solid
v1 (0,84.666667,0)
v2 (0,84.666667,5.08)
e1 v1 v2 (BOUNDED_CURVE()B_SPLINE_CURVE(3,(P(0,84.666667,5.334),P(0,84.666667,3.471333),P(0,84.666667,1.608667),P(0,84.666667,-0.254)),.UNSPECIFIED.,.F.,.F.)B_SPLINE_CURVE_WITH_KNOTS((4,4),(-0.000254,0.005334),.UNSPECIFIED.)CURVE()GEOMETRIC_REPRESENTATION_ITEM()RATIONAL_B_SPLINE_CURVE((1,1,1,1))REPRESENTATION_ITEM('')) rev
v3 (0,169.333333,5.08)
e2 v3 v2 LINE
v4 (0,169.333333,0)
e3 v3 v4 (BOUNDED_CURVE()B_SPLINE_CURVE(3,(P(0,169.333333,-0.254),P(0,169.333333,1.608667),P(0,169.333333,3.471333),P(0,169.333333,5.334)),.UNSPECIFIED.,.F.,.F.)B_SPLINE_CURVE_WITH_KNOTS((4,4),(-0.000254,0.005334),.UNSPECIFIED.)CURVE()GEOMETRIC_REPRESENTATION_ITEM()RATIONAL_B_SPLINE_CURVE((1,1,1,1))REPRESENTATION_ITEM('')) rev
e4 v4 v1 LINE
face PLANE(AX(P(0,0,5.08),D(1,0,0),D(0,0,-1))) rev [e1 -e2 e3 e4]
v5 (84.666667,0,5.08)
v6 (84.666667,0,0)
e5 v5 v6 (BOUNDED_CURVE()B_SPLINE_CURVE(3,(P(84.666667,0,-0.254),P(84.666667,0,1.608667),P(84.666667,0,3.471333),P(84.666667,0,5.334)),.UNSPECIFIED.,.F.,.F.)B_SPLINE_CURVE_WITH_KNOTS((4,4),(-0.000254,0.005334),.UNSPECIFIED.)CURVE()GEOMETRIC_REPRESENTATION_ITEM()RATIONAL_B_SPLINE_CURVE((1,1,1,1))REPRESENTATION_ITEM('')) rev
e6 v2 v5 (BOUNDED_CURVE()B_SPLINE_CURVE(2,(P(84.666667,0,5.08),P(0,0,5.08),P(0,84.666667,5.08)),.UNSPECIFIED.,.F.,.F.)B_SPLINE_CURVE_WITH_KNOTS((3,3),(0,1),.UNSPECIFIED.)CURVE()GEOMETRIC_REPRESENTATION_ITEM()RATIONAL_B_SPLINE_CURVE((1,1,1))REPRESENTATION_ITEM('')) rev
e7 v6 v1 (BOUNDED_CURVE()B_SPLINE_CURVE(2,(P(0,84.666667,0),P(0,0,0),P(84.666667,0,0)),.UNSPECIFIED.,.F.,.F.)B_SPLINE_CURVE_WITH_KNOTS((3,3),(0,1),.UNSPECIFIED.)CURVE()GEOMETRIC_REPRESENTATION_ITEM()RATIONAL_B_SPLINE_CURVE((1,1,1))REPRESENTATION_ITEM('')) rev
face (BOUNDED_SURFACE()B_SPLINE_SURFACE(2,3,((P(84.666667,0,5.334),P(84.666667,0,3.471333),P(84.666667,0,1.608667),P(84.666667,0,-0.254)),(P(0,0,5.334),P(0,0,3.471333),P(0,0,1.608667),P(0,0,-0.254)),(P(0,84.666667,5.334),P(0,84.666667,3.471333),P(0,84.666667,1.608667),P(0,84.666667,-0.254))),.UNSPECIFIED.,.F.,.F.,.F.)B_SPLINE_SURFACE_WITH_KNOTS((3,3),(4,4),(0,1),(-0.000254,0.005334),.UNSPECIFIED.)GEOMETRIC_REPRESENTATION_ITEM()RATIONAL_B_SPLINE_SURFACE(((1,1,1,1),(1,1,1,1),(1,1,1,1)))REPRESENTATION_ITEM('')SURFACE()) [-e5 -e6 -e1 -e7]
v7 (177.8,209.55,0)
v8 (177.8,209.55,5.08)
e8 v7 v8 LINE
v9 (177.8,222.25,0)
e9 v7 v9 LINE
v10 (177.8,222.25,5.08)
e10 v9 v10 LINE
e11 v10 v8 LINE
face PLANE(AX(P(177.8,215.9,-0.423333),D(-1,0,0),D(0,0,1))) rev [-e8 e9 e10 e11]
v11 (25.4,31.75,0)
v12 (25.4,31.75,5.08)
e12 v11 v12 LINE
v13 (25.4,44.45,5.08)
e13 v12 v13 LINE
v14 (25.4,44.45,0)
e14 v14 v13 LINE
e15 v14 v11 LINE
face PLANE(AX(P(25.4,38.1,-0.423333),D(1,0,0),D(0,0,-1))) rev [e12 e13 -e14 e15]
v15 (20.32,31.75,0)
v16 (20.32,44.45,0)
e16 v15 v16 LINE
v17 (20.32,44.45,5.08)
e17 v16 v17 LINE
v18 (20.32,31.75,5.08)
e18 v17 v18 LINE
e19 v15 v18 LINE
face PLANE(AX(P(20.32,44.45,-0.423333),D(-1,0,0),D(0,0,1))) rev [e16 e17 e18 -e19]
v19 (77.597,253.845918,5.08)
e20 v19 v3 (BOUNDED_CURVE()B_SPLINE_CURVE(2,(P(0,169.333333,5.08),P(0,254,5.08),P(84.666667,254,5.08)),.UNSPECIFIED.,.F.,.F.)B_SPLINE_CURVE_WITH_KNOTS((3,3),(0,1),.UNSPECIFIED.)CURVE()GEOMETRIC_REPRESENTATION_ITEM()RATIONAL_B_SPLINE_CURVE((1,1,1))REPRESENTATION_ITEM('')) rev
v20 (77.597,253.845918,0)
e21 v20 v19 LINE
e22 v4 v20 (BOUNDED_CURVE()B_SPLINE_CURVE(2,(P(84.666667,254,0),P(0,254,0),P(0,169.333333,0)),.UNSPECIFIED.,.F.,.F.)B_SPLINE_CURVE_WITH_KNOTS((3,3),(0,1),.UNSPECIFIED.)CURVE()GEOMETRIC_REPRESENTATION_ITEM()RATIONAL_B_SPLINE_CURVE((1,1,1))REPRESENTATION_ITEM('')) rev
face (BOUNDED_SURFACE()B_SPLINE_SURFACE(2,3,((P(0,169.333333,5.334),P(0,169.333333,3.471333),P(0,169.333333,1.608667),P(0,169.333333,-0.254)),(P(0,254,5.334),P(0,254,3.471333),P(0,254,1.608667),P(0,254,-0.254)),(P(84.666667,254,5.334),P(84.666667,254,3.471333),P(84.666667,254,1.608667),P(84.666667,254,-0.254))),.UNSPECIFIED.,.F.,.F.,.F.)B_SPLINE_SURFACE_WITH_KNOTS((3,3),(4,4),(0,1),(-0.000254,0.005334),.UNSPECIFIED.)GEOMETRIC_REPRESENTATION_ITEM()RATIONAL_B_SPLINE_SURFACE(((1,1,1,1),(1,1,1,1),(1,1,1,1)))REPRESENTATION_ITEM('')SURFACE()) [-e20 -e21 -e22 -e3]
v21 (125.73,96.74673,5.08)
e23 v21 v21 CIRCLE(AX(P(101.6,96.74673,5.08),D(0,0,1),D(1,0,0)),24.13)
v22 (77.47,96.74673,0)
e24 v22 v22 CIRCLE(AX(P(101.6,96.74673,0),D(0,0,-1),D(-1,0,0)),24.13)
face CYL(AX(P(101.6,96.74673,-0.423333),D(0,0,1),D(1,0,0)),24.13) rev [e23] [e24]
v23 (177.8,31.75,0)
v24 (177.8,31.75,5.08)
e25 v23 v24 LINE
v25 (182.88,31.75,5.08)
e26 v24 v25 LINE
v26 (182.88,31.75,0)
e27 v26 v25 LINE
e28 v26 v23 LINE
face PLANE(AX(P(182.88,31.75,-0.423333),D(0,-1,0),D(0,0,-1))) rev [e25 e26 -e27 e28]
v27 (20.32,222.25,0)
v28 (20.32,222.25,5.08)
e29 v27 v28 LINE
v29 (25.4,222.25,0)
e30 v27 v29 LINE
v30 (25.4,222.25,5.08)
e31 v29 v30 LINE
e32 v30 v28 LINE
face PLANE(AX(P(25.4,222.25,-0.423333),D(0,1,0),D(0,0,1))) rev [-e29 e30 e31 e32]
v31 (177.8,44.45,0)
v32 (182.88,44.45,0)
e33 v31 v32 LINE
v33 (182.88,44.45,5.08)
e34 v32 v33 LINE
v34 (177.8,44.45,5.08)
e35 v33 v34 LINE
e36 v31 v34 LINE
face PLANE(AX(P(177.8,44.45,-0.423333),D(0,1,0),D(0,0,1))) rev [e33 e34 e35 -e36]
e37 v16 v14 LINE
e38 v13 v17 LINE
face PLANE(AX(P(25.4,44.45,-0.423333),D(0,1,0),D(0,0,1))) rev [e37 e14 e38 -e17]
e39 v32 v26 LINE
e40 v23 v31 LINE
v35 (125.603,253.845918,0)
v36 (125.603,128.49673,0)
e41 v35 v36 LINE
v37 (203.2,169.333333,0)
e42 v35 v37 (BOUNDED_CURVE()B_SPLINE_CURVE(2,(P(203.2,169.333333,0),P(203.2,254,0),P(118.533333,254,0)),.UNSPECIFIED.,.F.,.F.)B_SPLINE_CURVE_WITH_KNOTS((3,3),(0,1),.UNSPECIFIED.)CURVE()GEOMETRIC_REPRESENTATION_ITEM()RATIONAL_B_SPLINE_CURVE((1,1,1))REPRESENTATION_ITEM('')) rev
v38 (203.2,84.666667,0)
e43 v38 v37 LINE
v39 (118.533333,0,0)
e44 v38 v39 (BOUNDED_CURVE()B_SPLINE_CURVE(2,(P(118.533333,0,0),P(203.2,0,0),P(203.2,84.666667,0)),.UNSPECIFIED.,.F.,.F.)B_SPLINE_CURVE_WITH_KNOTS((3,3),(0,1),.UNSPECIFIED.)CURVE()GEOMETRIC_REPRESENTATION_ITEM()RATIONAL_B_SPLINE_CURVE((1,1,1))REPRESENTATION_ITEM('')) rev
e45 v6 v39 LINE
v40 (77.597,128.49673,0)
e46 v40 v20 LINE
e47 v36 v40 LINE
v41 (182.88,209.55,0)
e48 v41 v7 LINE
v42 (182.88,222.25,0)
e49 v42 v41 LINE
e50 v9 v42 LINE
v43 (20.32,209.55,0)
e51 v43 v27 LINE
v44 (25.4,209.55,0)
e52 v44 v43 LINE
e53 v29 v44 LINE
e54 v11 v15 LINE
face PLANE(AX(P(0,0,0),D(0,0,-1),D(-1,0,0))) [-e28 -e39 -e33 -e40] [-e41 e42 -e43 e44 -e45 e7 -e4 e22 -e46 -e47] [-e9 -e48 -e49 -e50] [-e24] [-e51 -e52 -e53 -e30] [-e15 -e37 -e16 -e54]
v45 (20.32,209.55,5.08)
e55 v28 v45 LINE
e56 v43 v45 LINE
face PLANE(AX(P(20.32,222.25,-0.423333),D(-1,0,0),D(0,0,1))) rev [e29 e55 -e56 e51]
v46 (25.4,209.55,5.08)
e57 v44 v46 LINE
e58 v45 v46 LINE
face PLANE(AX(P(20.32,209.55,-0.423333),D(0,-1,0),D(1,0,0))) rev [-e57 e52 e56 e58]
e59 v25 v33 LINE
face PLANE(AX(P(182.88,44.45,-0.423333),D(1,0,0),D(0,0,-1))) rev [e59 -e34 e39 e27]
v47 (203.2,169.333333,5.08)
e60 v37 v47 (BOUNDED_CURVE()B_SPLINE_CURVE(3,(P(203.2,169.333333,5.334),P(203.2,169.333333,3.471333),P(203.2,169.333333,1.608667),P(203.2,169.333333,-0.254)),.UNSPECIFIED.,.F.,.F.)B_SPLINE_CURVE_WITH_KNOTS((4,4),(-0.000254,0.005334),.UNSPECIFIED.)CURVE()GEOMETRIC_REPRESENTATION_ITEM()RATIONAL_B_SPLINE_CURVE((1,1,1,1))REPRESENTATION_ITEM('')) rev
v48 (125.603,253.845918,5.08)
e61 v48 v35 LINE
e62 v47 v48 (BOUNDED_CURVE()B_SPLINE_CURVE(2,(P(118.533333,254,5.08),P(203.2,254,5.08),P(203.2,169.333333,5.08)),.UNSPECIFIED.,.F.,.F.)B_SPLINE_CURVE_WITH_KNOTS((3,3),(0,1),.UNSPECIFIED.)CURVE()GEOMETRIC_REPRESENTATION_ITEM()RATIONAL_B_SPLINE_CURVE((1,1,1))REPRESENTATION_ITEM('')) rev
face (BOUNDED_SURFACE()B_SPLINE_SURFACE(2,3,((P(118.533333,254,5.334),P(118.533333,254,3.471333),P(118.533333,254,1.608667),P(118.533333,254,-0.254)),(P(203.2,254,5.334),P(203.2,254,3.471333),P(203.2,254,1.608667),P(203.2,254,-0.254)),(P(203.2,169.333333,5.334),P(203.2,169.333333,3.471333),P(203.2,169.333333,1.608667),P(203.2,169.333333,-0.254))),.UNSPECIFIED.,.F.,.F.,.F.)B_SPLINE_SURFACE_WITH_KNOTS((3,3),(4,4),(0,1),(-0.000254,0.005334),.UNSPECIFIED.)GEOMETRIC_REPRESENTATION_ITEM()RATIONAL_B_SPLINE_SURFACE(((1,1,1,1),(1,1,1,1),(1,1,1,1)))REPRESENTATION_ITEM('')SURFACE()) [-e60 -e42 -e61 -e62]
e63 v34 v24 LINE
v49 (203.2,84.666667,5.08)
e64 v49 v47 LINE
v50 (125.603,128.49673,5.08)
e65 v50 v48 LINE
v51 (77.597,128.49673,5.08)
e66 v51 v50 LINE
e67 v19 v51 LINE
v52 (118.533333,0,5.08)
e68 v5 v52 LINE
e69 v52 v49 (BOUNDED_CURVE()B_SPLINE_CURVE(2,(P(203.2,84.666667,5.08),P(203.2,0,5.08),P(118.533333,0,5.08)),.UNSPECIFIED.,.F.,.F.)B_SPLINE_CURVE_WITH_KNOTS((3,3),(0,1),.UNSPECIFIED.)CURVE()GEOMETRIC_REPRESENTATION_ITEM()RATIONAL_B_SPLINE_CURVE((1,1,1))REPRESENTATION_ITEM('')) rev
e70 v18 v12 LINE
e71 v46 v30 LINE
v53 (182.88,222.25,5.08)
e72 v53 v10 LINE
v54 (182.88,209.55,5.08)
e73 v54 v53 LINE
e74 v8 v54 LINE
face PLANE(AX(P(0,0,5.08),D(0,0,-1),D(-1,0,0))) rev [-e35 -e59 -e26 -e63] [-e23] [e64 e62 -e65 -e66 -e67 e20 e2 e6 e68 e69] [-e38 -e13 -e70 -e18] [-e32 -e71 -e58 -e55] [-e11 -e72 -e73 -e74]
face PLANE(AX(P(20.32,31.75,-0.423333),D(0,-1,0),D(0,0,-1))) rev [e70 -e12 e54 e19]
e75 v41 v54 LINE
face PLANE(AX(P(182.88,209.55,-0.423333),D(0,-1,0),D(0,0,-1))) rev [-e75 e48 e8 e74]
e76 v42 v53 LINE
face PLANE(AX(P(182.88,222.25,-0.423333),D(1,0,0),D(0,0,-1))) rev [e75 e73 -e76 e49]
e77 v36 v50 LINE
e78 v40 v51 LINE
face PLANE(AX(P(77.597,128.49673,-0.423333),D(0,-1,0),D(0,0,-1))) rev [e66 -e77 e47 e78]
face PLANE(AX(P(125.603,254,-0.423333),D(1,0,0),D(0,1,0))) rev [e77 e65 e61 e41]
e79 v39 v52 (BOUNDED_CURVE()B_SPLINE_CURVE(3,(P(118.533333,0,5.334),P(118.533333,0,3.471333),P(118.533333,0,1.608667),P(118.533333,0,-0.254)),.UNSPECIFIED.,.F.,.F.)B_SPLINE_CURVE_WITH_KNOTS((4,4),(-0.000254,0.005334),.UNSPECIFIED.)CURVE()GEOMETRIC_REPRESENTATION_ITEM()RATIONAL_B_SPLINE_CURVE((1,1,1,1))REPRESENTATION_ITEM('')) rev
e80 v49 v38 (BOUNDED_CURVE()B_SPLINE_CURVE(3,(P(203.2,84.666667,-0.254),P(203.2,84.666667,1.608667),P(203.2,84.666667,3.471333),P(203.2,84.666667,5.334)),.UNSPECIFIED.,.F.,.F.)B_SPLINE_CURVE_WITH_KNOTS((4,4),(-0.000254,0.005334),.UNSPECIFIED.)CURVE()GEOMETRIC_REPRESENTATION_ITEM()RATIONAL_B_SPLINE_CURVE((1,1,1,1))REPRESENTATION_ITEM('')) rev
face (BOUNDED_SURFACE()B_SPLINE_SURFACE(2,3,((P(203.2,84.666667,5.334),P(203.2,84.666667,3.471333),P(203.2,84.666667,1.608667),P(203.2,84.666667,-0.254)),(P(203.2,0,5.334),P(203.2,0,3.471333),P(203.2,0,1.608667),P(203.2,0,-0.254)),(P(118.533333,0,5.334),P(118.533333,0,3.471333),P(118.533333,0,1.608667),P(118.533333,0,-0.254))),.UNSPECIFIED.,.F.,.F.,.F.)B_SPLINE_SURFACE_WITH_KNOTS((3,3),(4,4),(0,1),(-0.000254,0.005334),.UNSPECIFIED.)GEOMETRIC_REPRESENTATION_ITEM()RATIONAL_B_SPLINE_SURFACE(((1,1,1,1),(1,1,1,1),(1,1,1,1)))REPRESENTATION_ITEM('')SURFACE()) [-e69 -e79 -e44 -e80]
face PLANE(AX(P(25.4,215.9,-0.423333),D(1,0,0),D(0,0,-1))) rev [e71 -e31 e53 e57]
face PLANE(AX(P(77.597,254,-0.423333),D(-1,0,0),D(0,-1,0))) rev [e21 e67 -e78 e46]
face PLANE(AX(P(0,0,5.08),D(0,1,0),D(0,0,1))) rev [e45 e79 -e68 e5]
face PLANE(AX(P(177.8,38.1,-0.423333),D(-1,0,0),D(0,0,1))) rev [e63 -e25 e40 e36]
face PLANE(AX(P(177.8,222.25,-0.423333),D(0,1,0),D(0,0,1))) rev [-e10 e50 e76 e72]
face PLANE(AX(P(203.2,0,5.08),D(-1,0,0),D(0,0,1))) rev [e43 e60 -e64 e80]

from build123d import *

# Parameters (mm, degrees)
SKETCH1_W           = 203.2
SKETCH1_H           = 254
BOSS_EXTRUDE1_DEPTH = 5.08
FILLET1_SIZE        = 84.666666667
SKETCH2_R           = 24.13
CUT_EXTRUDE1_DEPTH  = 326.318377121
SKETCH8_W           = 48.006
SKETCH8_H           = 125.503270334
CUT_EXTRUDE6_DEPTH  = 326.318377121
CUT_EXTRUDE7_DEPTH  = 326.198087964


with BuildPart() as part:
    # Sketch1 → Boss-Extrude1 (new body)
    with BuildSketch(Plane.XY):
        with Locations((101.6, 127)):
            Rectangle(SKETCH1_W, SKETCH1_H)
    extrude(amount=BOSS_EXTRUDE1_DEPTH)

    # Fillet1
    # a fillet whose section is not a circle: 84.666666667 mm, written as the material it takes off along each edge
    with BuildSketch(Plane(origin=(203.2, 254, -211.666666667), x_dir=(0, -1, 0), z_dir=(0, 0, 1)), Plane(origin=(0, 254, -211.666666667), x_dir=(1, 0, 0), z_dir=(0, 0, 1)), Plane(origin=(203.2, 0, -211.666666667), x_dir=(-1, 0, 0), z_dir=(0, 0, 1))) as fillet1_piece_1:
        with BuildLine():
            Bezier((FILLET1_SIZE, 0), (0, 0), (0, -FILLET1_SIZE), weights=[1, 1, 1])
            Line((0, -FILLET1_SIZE), (0, 0))
            Line((0, 0), (FILLET1_SIZE, 0))
        make_face()
    extrude(amount=428.413333333, mode=Mode.SUBTRACT)
    with BuildSketch(Plane(origin=(0, 0, -211.666666667), x_dir=(1, 0, 0), z_dir=(0, 0, 1))) as fillet1_piece_2:
        with BuildLine():
            Bezier((FILLET1_SIZE, 0), (0, 0), (0, FILLET1_SIZE), weights=[1, 1, 1])
            Line((0, FILLET1_SIZE), (0, 0))
            Line((0, 0), (FILLET1_SIZE, 0))
        make_face()
    extrude(amount=428.413333333, mode=Mode.SUBTRACT)

    # Sketch2 → Cut-Extrude1 (cut, through all)
    with BuildSketch(Plane.XY.offset(5.08)):
        with Locations((101.6, 96.746729666)):
            Circle(SKETCH2_R)
    extrude(amount=-CUT_EXTRUDE1_DEPTH, mode=Mode.SUBTRACT)

    # Sketch8 → Cut-Extrude6 (cut, through all)
    with BuildSketch(Plane.XY.offset(5.08)):
        with Locations((101.6, 191.248364833)):
            Rectangle(SKETCH8_W, SKETCH8_H)
    extrude(amount=-CUT_EXTRUDE6_DEPTH, mode=Mode.SUBTRACT)

    # Sketch7 → Cut-Extrude7 (cut, through all)
    with BuildSketch(Plane.XY.offset(5.08)):
        Polygon((25.4, 215.9), (25.4, 222.25), (20.32, 222.25), (20.32, 209.55), (25.4, 209.55), align=None)
        Polygon((177.8, 215.9), (177.8, 222.25), (182.88, 222.25), (182.88, 209.55), (177.8, 209.55), align=None)
        Polygon((177.8, 38.1), (177.8, 44.45), (182.88, 44.45), (182.88, 31.75), (177.8, 31.75), align=None)
        Polygon((25.4, 38.1), (25.4, 44.45), (20.32, 44.45), (20.32, 31.75), (25.4, 31.75), align=None)
    extrude(amount=-CUT_EXTRUDE7_DEPTH, mode=Mode.SUBTRACT)


solid = part.part
